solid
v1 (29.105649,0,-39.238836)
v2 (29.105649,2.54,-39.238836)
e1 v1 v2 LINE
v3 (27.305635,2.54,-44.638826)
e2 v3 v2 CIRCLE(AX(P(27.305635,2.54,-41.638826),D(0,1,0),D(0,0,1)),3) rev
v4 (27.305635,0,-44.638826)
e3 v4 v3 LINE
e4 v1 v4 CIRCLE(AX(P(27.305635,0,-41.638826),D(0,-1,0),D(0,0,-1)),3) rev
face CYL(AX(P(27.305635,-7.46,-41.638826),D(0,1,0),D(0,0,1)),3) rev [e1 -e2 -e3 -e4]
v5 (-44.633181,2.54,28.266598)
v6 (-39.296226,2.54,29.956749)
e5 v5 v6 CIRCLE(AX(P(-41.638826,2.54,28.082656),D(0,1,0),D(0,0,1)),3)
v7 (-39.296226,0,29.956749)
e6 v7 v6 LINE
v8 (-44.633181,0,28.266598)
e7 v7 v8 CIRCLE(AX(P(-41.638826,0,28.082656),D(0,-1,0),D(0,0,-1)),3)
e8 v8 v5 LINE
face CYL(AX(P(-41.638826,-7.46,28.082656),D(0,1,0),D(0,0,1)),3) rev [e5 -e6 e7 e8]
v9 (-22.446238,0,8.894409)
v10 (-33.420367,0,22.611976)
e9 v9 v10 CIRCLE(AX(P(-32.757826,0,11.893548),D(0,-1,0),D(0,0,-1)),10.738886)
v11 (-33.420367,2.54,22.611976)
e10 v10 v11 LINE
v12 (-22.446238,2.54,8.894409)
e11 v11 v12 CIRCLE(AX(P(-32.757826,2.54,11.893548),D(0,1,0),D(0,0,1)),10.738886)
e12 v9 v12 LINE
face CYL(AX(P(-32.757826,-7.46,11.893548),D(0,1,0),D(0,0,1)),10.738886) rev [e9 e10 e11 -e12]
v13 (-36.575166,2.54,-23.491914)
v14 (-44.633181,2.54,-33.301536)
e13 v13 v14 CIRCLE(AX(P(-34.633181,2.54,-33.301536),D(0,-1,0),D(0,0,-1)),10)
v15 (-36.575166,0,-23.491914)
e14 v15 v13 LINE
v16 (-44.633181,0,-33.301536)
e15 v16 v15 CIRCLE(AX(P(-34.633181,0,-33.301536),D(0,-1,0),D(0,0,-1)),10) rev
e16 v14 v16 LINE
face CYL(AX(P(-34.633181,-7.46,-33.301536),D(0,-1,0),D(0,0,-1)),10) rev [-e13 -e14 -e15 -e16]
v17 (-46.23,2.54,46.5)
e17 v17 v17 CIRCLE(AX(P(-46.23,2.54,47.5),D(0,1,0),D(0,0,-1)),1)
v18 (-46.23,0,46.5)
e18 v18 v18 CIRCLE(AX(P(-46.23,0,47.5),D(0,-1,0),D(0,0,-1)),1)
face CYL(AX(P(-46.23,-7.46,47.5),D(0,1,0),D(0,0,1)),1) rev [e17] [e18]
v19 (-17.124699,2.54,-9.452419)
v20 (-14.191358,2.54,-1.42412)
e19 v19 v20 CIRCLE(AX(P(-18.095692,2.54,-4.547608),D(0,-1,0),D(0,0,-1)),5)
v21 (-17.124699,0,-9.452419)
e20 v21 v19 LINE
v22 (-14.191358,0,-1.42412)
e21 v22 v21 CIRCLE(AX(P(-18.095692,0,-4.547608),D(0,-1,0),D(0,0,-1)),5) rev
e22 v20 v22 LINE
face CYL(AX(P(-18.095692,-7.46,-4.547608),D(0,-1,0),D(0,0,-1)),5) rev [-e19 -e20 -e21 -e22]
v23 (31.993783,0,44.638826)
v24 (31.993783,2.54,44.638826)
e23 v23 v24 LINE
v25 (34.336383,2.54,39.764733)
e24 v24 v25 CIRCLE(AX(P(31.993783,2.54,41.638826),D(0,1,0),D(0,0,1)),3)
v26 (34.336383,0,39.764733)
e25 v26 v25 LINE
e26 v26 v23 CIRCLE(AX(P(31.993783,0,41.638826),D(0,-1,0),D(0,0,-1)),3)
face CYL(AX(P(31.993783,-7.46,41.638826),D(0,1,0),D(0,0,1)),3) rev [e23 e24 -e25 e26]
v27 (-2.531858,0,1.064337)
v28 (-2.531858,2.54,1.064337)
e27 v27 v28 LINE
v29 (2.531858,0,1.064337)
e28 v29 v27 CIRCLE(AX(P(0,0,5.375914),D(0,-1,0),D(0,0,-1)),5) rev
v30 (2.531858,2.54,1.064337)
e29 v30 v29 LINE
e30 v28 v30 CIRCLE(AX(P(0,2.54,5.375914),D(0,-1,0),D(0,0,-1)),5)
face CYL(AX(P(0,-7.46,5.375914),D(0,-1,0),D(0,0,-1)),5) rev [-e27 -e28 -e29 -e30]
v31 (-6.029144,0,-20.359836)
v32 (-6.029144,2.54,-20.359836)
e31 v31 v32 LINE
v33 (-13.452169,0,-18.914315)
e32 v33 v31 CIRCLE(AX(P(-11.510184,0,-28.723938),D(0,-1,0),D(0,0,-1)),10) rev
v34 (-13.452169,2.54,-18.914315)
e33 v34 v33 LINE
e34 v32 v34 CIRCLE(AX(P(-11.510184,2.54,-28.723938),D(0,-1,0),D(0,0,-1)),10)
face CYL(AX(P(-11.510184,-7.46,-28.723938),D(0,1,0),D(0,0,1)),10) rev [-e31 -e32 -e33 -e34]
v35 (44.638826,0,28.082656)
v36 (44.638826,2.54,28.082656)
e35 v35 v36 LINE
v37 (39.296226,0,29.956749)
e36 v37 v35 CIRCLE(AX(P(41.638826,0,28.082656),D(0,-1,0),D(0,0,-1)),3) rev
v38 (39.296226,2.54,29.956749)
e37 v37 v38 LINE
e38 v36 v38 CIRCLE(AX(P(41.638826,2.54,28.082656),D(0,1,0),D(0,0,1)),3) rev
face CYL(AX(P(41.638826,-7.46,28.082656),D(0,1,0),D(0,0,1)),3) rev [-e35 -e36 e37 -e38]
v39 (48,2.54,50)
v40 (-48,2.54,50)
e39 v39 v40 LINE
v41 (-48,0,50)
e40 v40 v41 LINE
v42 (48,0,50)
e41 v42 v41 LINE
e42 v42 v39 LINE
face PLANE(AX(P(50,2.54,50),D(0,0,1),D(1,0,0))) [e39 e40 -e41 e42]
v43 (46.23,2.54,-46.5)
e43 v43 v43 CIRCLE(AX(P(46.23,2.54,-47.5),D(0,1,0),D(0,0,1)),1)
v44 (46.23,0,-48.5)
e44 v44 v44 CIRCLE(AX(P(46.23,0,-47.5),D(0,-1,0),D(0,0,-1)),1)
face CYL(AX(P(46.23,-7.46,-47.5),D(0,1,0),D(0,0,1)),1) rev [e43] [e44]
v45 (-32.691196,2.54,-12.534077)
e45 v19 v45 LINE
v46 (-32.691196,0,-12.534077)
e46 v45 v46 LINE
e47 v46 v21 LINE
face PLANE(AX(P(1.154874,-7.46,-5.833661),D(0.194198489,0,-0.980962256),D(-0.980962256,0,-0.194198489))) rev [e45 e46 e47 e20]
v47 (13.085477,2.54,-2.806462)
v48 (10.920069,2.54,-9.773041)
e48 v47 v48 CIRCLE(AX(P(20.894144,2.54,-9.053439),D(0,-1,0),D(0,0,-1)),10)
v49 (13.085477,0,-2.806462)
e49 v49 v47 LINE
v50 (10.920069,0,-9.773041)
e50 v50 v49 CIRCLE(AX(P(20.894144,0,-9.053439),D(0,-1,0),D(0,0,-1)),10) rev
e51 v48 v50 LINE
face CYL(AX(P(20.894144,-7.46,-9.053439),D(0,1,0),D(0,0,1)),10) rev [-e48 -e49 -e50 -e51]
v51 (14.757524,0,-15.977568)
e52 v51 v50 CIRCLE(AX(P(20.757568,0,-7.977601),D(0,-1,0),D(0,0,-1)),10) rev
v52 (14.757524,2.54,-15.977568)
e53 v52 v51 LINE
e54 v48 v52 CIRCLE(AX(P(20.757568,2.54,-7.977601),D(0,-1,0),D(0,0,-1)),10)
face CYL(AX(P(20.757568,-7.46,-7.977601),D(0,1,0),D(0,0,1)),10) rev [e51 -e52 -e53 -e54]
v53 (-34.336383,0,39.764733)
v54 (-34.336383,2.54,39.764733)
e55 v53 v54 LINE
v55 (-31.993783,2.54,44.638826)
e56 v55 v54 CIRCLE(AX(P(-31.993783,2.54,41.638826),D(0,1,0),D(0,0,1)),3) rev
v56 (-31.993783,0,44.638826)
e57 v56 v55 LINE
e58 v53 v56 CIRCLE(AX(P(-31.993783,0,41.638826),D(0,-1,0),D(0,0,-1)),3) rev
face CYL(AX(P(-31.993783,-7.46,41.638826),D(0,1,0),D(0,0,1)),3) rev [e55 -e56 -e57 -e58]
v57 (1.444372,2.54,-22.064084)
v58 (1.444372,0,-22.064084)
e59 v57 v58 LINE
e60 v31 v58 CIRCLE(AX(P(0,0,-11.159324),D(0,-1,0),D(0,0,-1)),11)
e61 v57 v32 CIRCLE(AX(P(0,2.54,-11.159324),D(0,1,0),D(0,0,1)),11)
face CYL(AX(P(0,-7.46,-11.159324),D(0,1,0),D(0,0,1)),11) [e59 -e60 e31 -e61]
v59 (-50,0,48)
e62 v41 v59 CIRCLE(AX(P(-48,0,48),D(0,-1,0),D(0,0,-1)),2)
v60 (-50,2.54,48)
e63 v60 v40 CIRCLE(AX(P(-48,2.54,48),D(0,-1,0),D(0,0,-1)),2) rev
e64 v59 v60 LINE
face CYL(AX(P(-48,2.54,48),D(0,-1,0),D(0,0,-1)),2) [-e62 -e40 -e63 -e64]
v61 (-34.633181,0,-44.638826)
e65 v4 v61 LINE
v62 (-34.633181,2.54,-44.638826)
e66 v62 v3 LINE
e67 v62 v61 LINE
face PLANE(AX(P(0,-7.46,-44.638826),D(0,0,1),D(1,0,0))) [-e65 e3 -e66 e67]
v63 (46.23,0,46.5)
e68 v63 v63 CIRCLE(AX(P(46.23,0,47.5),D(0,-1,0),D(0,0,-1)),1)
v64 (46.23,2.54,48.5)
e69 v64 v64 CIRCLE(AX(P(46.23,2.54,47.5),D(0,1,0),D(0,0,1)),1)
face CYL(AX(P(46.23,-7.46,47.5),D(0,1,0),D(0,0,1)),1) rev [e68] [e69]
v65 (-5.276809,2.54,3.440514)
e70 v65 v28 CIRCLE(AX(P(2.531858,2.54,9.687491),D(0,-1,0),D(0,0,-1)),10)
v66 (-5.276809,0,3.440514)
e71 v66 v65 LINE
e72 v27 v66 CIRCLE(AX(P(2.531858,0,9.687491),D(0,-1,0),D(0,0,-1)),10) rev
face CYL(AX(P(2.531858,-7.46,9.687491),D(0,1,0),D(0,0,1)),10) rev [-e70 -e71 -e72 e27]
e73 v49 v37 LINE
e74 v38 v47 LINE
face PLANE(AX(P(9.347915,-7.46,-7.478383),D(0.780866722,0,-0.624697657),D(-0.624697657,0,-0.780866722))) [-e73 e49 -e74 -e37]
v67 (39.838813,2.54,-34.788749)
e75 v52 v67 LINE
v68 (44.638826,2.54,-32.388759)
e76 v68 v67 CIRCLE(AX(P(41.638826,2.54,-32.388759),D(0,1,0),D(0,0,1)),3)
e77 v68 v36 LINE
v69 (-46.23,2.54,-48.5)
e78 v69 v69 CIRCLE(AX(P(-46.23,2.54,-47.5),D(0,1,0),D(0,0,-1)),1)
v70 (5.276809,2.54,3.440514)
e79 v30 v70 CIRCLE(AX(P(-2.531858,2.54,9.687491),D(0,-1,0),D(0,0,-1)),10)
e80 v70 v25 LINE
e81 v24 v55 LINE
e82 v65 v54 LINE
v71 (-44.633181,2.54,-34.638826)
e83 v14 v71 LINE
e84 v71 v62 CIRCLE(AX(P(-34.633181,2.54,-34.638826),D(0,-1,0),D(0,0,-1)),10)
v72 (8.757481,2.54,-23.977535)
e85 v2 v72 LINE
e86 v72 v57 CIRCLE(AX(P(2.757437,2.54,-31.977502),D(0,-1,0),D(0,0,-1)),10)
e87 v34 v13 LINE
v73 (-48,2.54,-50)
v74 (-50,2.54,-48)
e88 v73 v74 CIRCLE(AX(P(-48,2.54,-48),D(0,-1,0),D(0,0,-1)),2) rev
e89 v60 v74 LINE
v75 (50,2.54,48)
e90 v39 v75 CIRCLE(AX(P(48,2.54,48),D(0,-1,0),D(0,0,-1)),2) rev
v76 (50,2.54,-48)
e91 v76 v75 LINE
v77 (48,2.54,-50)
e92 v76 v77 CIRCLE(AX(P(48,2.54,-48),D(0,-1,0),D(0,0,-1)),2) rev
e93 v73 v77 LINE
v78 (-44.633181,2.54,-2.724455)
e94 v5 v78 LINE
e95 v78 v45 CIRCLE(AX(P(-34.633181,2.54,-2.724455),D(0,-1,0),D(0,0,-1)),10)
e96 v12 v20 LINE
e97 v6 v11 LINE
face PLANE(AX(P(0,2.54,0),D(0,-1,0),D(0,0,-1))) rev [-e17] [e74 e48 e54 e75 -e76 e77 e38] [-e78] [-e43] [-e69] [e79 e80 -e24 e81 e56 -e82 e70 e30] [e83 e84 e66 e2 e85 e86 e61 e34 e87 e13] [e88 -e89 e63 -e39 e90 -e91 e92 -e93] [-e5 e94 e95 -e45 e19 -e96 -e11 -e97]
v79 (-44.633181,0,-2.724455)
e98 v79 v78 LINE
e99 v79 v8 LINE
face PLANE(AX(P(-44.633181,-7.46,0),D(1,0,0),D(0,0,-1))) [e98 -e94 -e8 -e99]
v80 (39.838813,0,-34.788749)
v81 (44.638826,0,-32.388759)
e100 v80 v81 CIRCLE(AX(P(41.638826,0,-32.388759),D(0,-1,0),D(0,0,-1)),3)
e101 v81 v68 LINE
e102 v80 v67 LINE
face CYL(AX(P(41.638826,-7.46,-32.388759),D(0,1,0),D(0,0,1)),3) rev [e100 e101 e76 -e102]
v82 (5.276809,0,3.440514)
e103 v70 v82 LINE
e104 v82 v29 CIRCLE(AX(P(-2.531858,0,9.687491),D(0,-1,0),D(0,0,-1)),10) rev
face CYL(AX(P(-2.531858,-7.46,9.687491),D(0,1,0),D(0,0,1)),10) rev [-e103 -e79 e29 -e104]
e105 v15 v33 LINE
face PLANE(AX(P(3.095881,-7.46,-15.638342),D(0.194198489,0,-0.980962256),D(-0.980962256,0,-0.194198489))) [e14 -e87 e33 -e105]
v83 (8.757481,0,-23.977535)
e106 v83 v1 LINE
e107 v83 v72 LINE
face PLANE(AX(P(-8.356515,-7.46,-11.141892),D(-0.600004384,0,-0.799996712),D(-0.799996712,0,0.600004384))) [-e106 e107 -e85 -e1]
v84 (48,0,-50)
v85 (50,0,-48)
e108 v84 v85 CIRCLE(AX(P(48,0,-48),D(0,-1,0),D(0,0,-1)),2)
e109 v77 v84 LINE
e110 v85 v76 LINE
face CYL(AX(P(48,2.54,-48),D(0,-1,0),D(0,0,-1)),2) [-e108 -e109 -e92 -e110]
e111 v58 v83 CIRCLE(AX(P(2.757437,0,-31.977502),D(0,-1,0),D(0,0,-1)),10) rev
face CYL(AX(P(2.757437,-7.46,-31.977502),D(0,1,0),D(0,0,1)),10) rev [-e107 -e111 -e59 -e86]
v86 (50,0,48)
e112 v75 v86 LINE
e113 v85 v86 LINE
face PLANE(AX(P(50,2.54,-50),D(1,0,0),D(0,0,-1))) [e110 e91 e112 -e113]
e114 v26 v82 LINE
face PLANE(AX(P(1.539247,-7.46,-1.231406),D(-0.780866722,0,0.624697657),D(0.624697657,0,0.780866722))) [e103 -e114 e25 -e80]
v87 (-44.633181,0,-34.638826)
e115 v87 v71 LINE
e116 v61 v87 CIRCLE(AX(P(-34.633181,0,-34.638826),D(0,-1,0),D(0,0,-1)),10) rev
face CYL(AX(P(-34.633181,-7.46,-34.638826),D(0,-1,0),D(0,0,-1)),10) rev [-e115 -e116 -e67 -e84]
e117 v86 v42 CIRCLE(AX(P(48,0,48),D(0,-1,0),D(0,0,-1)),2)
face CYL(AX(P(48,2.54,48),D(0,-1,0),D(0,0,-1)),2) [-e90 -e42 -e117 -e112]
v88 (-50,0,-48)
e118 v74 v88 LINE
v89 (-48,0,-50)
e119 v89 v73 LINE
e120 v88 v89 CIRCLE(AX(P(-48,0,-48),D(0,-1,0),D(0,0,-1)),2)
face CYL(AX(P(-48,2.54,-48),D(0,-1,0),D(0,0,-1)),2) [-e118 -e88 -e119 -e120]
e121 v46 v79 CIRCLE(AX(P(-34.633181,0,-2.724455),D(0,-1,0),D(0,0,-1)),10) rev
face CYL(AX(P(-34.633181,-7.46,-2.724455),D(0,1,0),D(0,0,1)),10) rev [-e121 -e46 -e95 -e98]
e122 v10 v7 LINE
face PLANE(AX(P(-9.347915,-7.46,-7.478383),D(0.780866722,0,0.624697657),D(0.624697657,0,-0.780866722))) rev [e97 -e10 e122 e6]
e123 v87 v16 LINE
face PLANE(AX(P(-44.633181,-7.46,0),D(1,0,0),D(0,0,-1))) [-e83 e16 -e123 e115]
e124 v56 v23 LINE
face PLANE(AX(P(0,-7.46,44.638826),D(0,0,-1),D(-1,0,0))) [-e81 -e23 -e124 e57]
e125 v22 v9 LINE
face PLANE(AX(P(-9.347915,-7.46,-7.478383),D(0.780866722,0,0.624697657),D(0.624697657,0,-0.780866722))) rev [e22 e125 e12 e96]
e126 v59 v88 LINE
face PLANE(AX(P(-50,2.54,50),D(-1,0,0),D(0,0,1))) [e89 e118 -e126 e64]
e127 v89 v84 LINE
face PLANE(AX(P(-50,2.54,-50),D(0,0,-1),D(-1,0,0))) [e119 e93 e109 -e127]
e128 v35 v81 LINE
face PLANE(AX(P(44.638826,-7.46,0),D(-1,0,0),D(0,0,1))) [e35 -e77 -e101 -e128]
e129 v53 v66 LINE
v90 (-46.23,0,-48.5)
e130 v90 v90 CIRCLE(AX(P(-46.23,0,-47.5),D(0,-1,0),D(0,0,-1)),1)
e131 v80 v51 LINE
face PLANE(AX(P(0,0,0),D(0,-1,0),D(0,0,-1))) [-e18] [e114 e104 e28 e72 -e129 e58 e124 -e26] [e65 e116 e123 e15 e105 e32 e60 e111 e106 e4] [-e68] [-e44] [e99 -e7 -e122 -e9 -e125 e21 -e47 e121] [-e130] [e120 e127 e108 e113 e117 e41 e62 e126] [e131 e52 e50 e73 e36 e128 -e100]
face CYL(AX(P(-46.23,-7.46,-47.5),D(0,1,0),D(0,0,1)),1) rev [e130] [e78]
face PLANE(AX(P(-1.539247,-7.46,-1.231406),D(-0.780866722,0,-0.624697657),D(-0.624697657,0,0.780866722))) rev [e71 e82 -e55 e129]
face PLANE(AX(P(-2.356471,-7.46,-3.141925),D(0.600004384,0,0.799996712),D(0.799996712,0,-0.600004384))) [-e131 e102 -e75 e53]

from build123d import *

# Parameters (mm, degrees)
SKETCH1_W           = 100
SKETCH1_H           = 100
BOSS_EXTRUDE1_DEPTH = 2.54
FILLET1_R           = 2
CUT_EXTRUDE1_DEPTH  = 10
SKETCH2_R           = 1
CUT_EXTRUDE2_DEPTH  = 10
FILLET2_R           = 10
FILLET3_R           = 5


with BuildPart() as part:
    # Sketch1 → Boss-Extrude1 (new body)
    with BuildSketch(Plane.XZ):
        Rectangle(SKETCH1_W, SKETCH1_H)
    extrude(amount=-BOSS_EXTRUDE1_DEPTH)

    # Fillet1
    fillet1_edges = [part.edges().sort_by_distance(p)[0] for p in [
        (-50, 1.27, 50),
        (50, 1.27, 50),
        (50, 1.27, -50),
        (-50, 1.27, -50),
    ]]
    fillet(fillet1_edges, radius=FILLET1_R)

    # Sketch5 → Cut-Extrude1 (cut)
    with BuildSketch(Plane(origin=(0, 2.54, 0), x_dir=(1, 0, 0), z_dir=(0, 1, 0))):
        with BuildLine():
            Line((-10.582420377, 8.15726173), (-44.633181304, 14.898200311))
            Line((-44.633181304, 14.898200311), (-44.633181304, -28.266598236))
            ThreePointArc((-44.633181304, -28.266598236), (-42.544556917, -30.942665333), (-39.296225546, -29.95674939))
            Line((-39.296225546, -29.95674939), (-33.420366711, -22.611976162))
            ThreePointArc((-33.420366711, -22.611976162), (-41.143464147, -5.184990934), (-22.44623806, -8.89440932))
            Line((-22.44623806, -8.89440932), (-10.025095622, 6.631912364))
            ThreePointArc((-10.025095622, 6.631912364), (-10.331945682, 7.384287968), (-10.582420377, 8.15726173))
        make_face()
        with BuildLine():
            Line((34.336383268, -39.764732741), (2.216428403, 0.384935794))
            ThreePointArc((2.216428403, 0.384935794), (0, 0.159324182), (-2.216428403, 0.384935794))
            Line((-2.216428403, 0.384935794), (-34.336383268, -39.764732741))
            ThreePointArc((-34.336383268, -39.764732741), (-34.697694983, -42.938387386), (-31.993783102, -44.638825712))
            Line((-31.993783102, -44.638825712), (31.993783102, -44.638825712))
            ThreePointArc((31.993783102, -44.638825712), (34.697694983, -42.938387386), (34.336383268, -39.764732741))
        make_face()
        with BuildLine():
            Line((39.838812559, 34.788749055), (10.83835688, 13.038158963))
            ThreePointArc((10.83835688, 13.038158963), (10.959514717, 12.102211852), (11, 11.159324182))
            ThreePointArc((11, 11.159324182), (10.75351226, 8.843730505), (10.025095622, 6.631912364))
            Line((10.025095622, 6.631912364), (39.296225546, -29.95674939))
            ThreePointArc((39.296225546, -29.95674939), (42.631851266, -30.913539718), (44.638825712, -28.08265642))
            Line((44.638825712, -28.08265642), (44.638825712, 32.38875892))
            ThreePointArc((44.638825712, 32.38875892), (42.980459146, 35.072044169), (39.838812559, 34.788749055))
        make_face()
        with BuildLine():
            Line((27.305635475, 44.638825712), (-34.363291806, 44.638825712))
            Line((-34.363291806, 44.638825712), (-44.633181304, 44.638825712))
            Line((-44.633181304, 44.638825712), (-44.633181304, 34.358849433))
            Line((-44.633181304, 34.358849433), (-44.633181304, 25.087137554))
            Line((-44.633181304, 25.087137554), (-8.643933661, 17.962441914))
            ThreePointArc((-8.643933661, 17.962441914), (-2.446557859, 21.883798745), (4.838313038, 21.038126081))
            Line((4.838313038, 21.038126081), (29.105648628, 39.238835577))
            ThreePointArc((29.105648628, 39.238835577), (30.15168277, 42.587516809), (27.305635475, 44.638825712))
        make_face()
        with BuildLine():
            Line((-33.420366711, -22.611976162), (-22.44623806, -8.89440932))
            ThreePointArc((-22.44623806, -8.89440932), (-41.143464147, -5.184990934), (-33.420366711, -22.611976162))
        make_face()
        with BuildLine():
            ThreePointArc((-22.01893977, -11.893547741), (-22.12630101, -10.378835302), (-22.44623806, -8.89440932))
            Line((-22.44623806, -8.89440932), (-33.420366711, -22.611976162))
            ThreePointArc((-33.420366711, -22.611976162), (-25.402259154, -19.71782477), (-22.01893977, -11.893547741))
        make_face()
    extrude(amount=-CUT_EXTRUDE1_DEPTH, mode=Mode.SUBTRACT)

    # Sketch2 → Cut-Extrude2 (cut)
    with BuildSketch(Plane(origin=(0, 2.54, 0), x_dir=(1, 0, 0), z_dir=(0, 1, 0))):
        with Locations(Location((-46.23, -47.5, 0), (0, 0, 90))):
            Circle(SKETCH2_R)
        with Locations(Location((-46.23, 47.5, 0), (0, 0, 90))):
            Circle(SKETCH2_R)
        with Locations(Location((46.23, 47.5, 0), (0, 0, 270))):
            Circle(SKETCH2_R)
        with Locations(Location((46.23, -47.5, 0), (0, 0, 270))):
            Circle(SKETCH2_R)
    extrude(amount=-CUT_EXTRUDE2_DEPTH, mode=Mode.SUBTRACT)

    # Fillet2
    # the kernel refuses this fillet: 10 mm, written as the material it adds along each edge
    with BuildSketch(Plane(origin=(-2.216428403, 2.54, -0.384935794), x_dir=(0.9991591303691161, 0, 0.04100039268143086), z_dir=(0, -1, 0)), Plane(origin=(-10.582420377, 2.54, -8.15726173), x_dir=(0.42439359901934914, 0, 0.9054778148090675), z_dir=(0, -1, 0))) as fillet2_piece_1:
        with BuildLine():
            CenterArc((5.15726697, 9.869275424), FILLET2_R, 216.310191596, 44.415308597)
            Line((-2.90096267, 3.94771017), (0, 0))
            ThreePointArc((0, 0), (1.772810521, 0.143797033), (3.545621042, 0))
        make_face()
    extrude(amount=2.54)
    with BuildSketch(Plane(origin=(2.216428403, 2.54, -0.384935794), x_dir=(0.6246976569815567, 0, 0.780866721894174), z_dir=(0, -1, 0)), Plane(origin=(10.83835688, 2.54, -13.038158963), x_dir=(0.7999967117807752, 0, -0.6000043842672711), z_dir=(0, -1, 0)), Plane(origin=(-10.025095622, 2.54, -6.631912364), x_dir=(-0.624697656981556, 0, 0.7808667218941745), z_dir=(0, -1, 0))) as fillet2_piece_2:
        with BuildLine():
            CenterArc((4.898979486, 10), FILLET2_R, 225.584691403, 44.415308597)
            ThreePointArc((-2.099562637, 2.857142857), (-0.933906367, 1.51372178), (0, 0))
            Line((0, 0), (4.898979486, 0))
        make_face()
    extrude(amount=2.54)
    with BuildSketch(Plane(origin=(4.838313038, 2.54, -21.038126081), x_dir=(0.7999967117807896, 0, -0.600004384267252), z_dir=(0, -1, 0)), Plane(origin=(10.025095622, 2.54, -6.631912364), x_dir=(0.6246976569815559, 0, 0.7808667218941746), z_dir=(0, -1, 0))) as fillet2_piece_3:
        with BuildLine():
            CenterArc((4.898979486, -10), FILLET2_R, 90, 44.415308597)
            ThreePointArc((-2.099562637, -2.857142857), (-0.933906367, -1.51372178), (0, 0))
            Line((0, 0), (4.898979486, 0))
        make_face()
    extrude(amount=2.54)
    with BuildSketch(Plane(origin=(-8.643933661, 2.54, -17.962441914), x_dir=(0.7370833881406508, 0, -0.6758018044716206), z_dir=(0, -1, 0))) as fillet2_piece_4:
        with BuildLine():
            CenterArc((5.159972861, -9.869137303), FILLET2_R, 99.279408895, 44.434942373)
            Line((-2.900792564, -3.951024364), (0, 0))
            ThreePointArc((0, 0), (1.773740671, -0.143948967), (3.547481342, 0))
        make_face()
    extrude(amount=2.54)
    with BuildSketch(Plane(origin=(-44.633181304, 2.54, -25.087137554), x_dir=(0.9809622556130392, 0, 0.19419848882671173), z_dir=(0, -1, 0))) as fillet2_piece_5:
        with BuildLine():
            CenterArc((FILLET2_R * 0.821439873515, -FILLET2_R), FILLET2_R, 90, 78.802094649)
            Line((-FILLET2_R * 0.159522382099, -FILLET2_R * 0.805801511173), (0, 0))
            Line((0, 0), (FILLET2_R * 0.821439873515, 0))
        make_face()
    extrude(amount=2.54)
    with BuildSketch(Plane(origin=(-44.633181304, 2.54, -44.638825712), x_dir=(1, 0, 0), z_dir=(0, -1, 0))) as fillet2_piece_6:
        with BuildLine():
            CenterArc((FILLET2_R, FILLET2_R), FILLET2_R, 180, 90)
            Line((0, FILLET2_R), (0, 0))
            Line((0, 0), (FILLET2_R, 0))
        make_face()
    extrude(amount=2.54)
    with BuildSketch(Plane(origin=(-44.633181304, 2.54, -14.898200311), x_dir=(0.9809622556130391, 0, 0.19419848882671228), z_dir=(0, -1, 0))) as fillet2_piece_7:
        with BuildLine():
            CenterArc((FILLET2_R * 1.21737455442, FILLET2_R), FILLET2_R, 168.802094649, 101.197905351)
            Line((FILLET2_R * 0.236412298804, FILLET2_R * 1.19419848883), (0, 0))
            Line((0, 0), (FILLET2_R * 1.21737455442, 0))
        make_face()
    extrude(amount=2.54)

    # Fillet3
    fillet3_edges = [part.edges().sort_by_distance(p)[0] for p in [
        (0, 1.27, 0.013314064),
        (-11.084977947, 1.27, -7.109148691),
    ]]
    fillet(fillet3_edges, radius=FILLET3_R)


solid = part.part
